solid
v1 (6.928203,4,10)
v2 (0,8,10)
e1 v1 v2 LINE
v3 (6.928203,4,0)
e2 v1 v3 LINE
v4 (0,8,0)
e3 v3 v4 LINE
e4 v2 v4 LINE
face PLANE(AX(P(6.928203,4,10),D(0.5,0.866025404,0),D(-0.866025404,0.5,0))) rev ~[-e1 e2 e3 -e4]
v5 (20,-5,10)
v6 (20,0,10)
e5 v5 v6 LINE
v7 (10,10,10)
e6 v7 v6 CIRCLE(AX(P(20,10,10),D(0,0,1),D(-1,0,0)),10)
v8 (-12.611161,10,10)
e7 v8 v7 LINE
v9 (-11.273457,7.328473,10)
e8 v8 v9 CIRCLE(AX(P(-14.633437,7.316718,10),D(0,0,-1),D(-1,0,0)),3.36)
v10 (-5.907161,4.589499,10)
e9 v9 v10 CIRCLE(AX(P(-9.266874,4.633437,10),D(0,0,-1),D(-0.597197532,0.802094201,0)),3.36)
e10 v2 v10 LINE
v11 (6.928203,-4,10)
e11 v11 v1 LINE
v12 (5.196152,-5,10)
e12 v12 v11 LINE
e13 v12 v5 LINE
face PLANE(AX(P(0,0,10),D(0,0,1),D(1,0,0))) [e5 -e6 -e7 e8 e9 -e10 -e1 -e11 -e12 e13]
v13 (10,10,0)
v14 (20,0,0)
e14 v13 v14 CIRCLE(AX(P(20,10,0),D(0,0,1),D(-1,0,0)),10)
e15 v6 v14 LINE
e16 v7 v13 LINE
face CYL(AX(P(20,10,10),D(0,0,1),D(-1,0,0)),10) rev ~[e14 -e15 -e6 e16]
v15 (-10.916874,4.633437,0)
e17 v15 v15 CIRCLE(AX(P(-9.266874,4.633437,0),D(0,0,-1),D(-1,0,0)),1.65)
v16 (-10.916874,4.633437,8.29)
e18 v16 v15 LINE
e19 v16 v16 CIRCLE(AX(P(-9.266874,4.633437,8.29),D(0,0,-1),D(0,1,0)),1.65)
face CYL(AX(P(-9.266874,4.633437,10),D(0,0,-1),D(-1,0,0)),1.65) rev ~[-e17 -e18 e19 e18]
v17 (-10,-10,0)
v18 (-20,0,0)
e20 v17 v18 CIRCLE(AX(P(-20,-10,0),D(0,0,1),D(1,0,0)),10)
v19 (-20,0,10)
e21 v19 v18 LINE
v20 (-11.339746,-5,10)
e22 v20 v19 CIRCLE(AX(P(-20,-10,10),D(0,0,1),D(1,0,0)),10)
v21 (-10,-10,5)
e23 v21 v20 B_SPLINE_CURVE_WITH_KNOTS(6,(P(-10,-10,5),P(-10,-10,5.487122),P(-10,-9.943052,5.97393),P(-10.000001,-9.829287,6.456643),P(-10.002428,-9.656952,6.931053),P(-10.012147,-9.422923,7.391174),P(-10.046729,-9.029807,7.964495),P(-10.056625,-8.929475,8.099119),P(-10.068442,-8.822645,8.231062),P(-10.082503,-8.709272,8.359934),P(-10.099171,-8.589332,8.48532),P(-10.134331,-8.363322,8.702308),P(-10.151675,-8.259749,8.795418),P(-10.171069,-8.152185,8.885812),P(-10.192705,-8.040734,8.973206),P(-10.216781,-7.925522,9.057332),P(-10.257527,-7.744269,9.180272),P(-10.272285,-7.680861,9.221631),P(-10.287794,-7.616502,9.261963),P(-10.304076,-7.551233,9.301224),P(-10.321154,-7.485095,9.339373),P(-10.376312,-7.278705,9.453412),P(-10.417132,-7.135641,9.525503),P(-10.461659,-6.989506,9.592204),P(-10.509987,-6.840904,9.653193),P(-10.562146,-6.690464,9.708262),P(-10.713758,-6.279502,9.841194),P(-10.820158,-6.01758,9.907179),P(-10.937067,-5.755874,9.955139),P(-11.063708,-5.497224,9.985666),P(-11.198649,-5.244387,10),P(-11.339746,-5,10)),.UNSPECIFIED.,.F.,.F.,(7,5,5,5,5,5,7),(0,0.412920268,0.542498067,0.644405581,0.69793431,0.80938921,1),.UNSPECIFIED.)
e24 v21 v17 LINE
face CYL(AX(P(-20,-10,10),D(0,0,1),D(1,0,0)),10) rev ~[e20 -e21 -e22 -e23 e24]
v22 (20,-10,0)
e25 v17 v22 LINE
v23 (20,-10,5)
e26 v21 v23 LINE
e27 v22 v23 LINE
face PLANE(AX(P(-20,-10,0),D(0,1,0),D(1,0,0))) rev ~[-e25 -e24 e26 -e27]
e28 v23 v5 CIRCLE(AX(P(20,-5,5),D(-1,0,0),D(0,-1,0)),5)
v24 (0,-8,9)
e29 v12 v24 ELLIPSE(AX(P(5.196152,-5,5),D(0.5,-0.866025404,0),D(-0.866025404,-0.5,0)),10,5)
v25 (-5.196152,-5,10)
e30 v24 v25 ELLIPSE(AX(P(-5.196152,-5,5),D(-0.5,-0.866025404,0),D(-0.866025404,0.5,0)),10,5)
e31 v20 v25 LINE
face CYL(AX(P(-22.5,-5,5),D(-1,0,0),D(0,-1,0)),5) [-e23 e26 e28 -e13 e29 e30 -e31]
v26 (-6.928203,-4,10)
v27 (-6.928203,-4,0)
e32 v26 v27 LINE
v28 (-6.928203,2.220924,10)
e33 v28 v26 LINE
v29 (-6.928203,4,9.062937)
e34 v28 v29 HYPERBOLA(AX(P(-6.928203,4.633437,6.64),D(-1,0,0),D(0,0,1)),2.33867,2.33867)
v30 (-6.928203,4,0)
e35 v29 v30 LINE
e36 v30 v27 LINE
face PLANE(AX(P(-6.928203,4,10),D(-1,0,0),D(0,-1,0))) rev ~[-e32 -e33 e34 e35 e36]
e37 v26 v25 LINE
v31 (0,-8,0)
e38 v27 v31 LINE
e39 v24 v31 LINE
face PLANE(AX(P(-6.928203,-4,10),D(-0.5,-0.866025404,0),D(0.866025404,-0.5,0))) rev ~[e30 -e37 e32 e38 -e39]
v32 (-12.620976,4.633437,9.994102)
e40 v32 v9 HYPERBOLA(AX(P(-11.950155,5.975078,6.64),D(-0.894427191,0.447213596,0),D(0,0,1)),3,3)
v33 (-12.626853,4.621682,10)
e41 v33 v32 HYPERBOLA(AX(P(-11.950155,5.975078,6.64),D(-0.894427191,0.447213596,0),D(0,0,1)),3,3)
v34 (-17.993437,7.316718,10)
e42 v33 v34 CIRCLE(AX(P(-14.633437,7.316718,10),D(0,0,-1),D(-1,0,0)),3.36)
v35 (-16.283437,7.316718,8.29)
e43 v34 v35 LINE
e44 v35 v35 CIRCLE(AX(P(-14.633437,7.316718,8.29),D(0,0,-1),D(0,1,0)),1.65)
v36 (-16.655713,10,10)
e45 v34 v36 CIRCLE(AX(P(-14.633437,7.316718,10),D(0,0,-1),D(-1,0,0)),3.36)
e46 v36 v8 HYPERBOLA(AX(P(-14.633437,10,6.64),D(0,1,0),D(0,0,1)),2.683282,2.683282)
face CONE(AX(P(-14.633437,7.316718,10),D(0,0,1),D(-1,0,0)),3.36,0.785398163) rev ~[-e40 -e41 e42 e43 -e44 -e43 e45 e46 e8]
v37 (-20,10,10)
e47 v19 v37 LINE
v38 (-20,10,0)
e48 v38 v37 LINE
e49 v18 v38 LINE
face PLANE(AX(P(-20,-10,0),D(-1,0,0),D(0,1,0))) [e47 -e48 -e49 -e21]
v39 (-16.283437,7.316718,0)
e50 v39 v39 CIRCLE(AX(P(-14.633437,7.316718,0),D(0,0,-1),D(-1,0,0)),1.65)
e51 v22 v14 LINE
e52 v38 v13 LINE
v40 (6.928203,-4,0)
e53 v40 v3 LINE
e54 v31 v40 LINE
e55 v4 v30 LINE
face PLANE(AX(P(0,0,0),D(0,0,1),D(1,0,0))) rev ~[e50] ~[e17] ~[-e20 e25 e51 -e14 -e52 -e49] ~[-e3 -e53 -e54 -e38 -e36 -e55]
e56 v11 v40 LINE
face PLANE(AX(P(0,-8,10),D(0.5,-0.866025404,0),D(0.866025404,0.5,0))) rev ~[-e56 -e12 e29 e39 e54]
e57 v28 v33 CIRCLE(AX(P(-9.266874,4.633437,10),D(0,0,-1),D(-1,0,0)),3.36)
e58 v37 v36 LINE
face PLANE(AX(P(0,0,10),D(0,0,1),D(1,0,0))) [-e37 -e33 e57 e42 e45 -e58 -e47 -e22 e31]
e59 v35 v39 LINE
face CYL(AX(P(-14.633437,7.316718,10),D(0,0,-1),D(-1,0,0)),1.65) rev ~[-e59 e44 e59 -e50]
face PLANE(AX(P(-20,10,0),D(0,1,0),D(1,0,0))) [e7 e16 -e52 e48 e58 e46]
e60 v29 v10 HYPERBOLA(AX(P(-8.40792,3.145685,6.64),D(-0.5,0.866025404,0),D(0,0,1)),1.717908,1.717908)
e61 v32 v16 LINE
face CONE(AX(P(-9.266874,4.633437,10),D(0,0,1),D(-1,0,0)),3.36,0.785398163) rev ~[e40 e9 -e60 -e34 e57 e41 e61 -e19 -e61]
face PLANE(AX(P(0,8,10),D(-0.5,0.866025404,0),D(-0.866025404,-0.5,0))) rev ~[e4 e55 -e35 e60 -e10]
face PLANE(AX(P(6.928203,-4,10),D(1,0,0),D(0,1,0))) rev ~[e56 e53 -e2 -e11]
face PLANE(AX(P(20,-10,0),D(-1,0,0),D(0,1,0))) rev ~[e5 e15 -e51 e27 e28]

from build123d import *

# Parameters (mm, degrees)
F0_W           = 40
F0_H           = 20
F1_DEPTH       = 10
F3_DEPTH       = 25
F5_D           = 3.3
F5_CSINK_D     = 6.72
F5_CSINK_ANGLE = 90
F6_T1_DEPTH    = 55


# Not quite as in the source:
# - a fillet or chamfer that OpenCascade refuses, or shapes differently, is made with other operations: its cross-section is extruded or revolved along the edge and cut away or added


with BuildPart() as f1:
    # F0 (on Top) → F1 (new body)
    with BuildSketch(Plane.XY):
        Rectangle(F0_W, F0_H)
    extrude(amount=F1_DEPTH)

    # F2 (on face) → F3 (cut)
    with BuildSketch(Plane.XY.offset(10)):
        Polygon((0, -8), (6.9282032303, -4), (6.9282032303, 4), (0, 8), (-6.9282032303, 4), (-6.9282032303, -4), align=None)
        with BuildLine():
            ThreePointArc((-10, -10), (-12.9289321881, -2.9289321881), (-20, 0))
            Line((-20, 0), (-20, -10))
            Line((-20, -10), (-10, -10))
        make_face()
        with BuildLine():
            Line((20, 10), (10, 10))
            ThreePointArc((10, 10), (12.9289321881, 2.9289321881), (20, 0))
            Line((20, 0), (20, 10))
        make_face()
    extrude(amount=-F3_DEPTH, mode=Mode.SUBTRACT)

    # F5 (through all)
    with Locations(Plane.XY.offset(10)):
        with Locations((-14.633436854, 7.316718427), (-9.266873708, 4.633436854)):
            CounterSinkHole(F5_D / 2, F5_CSINK_D / 2, counter_sink_angle=F5_CSINK_ANGLE)

    # F6: fillet of radius 5 on 1 edges, made by hand

    # F6_s2 → F6_t1 (cut)
    with BuildSketch(Plane.YZ.offset(-22.5)):
        with BuildLine():
            ThreePointArc((-10, 5), (-8.5355339059, 8.5355339059), (-5, 10))
            Line((-5, 10), (-10, 10))
            Line((-10, 10), (-10, 5))
        make_face()
    extrude(amount=F6_T1_DEPTH, mode=Mode.SUBTRACT)


solid = f1.part
